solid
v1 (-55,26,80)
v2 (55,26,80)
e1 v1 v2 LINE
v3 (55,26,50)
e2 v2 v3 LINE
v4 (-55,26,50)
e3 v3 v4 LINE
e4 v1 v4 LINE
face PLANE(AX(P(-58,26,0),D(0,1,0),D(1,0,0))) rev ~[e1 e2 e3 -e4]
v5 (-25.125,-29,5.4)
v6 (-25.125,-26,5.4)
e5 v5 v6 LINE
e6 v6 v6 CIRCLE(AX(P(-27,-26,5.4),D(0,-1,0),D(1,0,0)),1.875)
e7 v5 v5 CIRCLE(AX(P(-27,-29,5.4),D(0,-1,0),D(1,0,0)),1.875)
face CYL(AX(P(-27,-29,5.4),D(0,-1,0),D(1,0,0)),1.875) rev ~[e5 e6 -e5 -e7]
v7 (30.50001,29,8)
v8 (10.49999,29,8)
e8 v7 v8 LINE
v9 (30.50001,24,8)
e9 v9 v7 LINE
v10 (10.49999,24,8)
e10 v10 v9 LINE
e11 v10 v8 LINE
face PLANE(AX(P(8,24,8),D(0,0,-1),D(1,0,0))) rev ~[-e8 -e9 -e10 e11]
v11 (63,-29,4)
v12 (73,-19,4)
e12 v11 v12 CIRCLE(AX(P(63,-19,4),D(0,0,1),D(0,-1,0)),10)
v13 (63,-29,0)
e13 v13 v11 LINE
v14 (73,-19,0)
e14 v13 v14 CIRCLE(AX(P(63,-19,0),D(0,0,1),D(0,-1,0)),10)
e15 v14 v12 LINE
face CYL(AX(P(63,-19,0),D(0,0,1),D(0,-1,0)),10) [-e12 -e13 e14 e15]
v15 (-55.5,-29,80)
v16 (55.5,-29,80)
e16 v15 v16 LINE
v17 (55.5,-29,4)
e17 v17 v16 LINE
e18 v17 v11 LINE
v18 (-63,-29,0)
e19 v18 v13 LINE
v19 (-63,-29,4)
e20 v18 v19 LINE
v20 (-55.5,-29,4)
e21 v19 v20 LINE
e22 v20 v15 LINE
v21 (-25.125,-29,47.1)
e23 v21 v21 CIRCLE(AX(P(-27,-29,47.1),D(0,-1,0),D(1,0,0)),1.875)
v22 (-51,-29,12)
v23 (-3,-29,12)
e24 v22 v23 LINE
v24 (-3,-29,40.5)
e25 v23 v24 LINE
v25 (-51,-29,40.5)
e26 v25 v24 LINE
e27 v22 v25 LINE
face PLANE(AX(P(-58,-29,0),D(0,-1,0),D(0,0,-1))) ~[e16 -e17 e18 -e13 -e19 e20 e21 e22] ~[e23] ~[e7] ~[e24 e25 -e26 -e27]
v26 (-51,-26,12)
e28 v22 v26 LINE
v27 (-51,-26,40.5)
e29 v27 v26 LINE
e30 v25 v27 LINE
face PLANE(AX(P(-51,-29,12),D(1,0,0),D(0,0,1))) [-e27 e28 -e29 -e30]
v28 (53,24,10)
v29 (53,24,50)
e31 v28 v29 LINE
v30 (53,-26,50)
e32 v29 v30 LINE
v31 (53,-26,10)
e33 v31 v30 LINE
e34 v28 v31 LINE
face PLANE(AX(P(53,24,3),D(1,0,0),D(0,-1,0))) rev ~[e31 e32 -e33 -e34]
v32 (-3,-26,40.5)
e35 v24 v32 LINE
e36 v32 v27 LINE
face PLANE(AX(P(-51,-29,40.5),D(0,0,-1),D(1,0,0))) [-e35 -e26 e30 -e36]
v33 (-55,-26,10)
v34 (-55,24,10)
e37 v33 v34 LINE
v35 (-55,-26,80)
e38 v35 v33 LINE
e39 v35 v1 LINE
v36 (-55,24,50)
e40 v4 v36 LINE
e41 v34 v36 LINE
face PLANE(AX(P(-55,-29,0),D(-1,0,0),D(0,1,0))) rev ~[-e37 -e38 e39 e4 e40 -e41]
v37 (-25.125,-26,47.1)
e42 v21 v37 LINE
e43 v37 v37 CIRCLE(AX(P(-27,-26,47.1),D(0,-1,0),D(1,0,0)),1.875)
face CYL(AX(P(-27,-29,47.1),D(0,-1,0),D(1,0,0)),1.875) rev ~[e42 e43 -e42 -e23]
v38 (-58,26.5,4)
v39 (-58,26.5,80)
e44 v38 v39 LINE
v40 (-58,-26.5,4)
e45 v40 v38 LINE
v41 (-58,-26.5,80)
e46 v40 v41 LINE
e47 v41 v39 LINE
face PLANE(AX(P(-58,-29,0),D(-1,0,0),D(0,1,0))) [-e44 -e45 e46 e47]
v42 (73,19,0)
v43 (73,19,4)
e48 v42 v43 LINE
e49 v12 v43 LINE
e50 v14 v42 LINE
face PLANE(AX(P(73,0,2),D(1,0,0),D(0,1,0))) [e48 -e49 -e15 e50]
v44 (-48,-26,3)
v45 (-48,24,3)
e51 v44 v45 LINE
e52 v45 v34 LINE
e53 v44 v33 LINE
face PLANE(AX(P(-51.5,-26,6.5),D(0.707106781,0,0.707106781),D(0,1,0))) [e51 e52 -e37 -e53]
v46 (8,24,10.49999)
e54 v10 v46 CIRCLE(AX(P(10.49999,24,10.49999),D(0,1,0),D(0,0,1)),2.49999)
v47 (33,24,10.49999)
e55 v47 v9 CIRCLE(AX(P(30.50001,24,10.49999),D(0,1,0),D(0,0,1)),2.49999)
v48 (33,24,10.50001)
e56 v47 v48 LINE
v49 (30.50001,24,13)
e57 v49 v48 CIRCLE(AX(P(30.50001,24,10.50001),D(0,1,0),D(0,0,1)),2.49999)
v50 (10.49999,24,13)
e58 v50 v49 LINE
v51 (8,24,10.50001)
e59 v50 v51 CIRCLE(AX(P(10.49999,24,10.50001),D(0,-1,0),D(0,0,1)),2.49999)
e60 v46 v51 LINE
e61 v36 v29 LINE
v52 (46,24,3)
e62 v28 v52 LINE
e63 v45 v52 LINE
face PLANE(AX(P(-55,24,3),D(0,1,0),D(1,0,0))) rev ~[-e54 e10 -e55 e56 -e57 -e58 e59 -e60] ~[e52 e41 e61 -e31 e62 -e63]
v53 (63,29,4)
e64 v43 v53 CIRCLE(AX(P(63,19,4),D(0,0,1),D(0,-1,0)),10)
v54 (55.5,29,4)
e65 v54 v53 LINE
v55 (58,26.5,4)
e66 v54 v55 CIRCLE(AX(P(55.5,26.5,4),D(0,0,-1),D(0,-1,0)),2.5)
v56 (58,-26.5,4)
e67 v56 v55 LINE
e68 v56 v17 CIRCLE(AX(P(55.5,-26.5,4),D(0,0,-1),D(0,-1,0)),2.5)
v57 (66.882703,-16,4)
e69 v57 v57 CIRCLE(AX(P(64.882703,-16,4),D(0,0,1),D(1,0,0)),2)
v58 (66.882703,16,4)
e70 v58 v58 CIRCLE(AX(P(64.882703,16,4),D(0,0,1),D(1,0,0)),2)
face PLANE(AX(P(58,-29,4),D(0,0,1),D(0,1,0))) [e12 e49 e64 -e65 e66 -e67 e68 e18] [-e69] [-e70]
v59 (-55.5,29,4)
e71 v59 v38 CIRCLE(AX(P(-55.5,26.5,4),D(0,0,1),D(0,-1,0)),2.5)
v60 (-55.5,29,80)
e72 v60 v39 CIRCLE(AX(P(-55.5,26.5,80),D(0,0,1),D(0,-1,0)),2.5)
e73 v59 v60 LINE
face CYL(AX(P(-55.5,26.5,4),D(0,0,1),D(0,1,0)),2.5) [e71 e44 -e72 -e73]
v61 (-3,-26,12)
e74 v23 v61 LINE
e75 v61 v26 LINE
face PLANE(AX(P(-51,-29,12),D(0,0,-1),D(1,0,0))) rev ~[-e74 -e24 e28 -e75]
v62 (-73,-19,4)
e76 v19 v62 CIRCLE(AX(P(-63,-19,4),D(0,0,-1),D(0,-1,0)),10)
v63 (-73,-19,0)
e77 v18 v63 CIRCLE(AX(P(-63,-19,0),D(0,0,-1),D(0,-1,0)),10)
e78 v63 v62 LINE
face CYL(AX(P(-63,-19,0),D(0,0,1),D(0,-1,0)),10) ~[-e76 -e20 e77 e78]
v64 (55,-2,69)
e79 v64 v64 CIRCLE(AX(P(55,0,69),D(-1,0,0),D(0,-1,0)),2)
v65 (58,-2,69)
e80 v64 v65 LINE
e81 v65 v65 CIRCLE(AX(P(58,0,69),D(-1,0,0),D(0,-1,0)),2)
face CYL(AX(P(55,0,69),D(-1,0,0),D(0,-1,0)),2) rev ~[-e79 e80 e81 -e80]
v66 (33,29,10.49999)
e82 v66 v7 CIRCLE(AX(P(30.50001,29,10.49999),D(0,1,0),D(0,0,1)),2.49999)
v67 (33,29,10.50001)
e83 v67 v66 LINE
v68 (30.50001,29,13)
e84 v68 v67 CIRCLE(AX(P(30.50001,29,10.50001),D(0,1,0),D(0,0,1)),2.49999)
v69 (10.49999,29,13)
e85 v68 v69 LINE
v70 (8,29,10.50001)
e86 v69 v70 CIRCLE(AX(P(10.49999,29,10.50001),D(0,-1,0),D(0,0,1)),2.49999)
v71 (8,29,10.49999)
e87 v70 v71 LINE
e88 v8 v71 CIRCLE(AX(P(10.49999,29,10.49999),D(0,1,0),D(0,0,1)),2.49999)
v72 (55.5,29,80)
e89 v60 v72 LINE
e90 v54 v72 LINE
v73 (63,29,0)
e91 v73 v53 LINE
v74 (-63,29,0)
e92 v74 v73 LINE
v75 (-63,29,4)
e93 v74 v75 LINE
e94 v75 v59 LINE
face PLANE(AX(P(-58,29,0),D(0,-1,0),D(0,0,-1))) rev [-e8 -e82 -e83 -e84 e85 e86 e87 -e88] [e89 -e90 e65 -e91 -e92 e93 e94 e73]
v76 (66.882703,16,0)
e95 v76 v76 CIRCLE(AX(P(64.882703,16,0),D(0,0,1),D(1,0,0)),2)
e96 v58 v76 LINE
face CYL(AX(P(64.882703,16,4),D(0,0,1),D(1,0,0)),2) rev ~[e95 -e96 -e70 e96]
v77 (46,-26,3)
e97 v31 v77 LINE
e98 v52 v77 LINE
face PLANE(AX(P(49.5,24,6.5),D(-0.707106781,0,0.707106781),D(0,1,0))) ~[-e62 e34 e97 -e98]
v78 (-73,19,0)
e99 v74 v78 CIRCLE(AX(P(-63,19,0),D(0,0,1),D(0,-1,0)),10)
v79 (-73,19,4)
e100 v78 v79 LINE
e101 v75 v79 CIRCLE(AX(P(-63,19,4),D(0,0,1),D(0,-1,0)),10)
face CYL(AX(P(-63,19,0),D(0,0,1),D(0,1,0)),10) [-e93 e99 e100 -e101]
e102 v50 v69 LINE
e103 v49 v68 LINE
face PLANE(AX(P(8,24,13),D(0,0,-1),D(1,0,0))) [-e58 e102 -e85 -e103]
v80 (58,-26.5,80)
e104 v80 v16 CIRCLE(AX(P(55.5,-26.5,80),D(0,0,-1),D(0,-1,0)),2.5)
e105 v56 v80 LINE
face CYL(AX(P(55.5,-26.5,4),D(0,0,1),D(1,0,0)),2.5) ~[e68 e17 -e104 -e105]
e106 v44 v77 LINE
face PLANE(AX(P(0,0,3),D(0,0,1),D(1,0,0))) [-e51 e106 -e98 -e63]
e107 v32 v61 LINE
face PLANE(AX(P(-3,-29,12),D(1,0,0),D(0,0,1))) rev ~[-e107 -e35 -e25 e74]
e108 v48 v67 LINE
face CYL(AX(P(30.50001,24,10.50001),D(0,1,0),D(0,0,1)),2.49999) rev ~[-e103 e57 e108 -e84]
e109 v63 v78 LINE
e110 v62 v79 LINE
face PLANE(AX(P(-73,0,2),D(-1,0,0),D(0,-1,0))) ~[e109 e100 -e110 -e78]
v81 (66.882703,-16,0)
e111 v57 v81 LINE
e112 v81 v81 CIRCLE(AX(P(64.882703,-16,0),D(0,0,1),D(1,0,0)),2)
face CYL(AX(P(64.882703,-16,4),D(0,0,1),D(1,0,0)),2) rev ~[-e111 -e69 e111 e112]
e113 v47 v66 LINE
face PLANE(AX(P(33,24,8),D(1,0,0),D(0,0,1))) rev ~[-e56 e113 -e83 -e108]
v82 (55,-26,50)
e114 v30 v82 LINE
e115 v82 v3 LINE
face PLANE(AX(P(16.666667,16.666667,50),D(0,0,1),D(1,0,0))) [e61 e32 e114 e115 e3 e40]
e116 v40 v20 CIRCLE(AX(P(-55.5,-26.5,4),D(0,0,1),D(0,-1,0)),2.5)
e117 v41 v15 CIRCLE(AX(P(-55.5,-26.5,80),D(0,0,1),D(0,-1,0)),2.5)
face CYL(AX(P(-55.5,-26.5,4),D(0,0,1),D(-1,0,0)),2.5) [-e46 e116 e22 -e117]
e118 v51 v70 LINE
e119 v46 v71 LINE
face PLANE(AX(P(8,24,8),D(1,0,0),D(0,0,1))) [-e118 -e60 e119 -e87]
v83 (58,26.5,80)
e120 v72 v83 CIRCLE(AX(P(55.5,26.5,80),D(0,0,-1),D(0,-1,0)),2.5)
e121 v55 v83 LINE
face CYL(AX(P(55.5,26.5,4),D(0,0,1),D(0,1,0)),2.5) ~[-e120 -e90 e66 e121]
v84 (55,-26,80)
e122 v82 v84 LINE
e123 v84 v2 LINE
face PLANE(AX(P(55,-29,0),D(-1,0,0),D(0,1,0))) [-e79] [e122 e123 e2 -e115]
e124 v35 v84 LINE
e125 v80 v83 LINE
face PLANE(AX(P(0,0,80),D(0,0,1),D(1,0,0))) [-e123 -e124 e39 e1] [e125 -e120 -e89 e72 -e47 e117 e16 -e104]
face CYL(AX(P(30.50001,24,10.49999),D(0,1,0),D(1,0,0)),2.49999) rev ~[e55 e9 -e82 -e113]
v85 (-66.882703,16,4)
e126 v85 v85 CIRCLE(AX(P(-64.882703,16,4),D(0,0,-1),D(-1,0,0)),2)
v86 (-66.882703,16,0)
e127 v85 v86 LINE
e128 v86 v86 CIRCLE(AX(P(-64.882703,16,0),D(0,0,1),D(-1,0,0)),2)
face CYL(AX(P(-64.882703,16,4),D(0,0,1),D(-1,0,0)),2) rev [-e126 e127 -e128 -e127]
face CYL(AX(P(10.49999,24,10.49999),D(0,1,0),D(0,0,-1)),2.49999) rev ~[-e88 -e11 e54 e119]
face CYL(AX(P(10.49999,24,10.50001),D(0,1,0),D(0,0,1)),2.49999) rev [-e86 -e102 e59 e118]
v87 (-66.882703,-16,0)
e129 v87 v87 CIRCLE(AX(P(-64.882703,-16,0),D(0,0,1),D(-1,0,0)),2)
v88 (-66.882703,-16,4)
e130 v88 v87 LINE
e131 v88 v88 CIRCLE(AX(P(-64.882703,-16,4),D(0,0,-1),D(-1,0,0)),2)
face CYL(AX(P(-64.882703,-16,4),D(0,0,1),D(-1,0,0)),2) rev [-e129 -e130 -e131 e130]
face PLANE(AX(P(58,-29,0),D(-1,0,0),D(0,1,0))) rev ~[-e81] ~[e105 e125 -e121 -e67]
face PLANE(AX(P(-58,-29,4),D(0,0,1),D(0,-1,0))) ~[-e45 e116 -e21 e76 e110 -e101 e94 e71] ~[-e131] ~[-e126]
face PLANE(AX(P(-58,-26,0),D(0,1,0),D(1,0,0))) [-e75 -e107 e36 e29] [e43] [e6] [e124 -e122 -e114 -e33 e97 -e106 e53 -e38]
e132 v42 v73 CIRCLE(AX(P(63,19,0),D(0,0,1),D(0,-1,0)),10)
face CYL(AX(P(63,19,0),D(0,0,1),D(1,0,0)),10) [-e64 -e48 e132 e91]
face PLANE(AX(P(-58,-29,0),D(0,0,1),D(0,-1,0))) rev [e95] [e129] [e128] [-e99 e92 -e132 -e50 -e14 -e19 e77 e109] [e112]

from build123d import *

# Parameters (mm, degrees)
F0_W      = 116
F0_H      = 58
F1_DEPTH  = 80
F2_T      = -3
F4_DEPTH  = 47
F5_R      = 2
F6_DEPTH  = 3.001
F7_W      = 58
F7_H      = 4
F8_DEPTH  = 15
F9_R      = 10
F10_R     = 2
F11_DEPTH = 4.001
F12_W     = 48
F12_H     = 28.5
F13_DEPTH = 5
F14_R     = 1.875
F15_DEPTH = 5
F16_W     = 25
F16_H     = 5
F17_DEPTH = 5.001
F18_R     = 2.49999
F19_R     = 2.5
F20_SIZE  = 7


# Not quite as in the source:
# - a fillet or chamfer is up to 0.001 mm smaller than in the source, because OpenCascade refuses the exact size
# - a pattern or mirror of a feature is missing from the dataset's text; its kind, count and spacing are read off the source's solid


with BuildPart() as f1:
    # F0 (on Top) → F1 (new body)
    with BuildSketch(Plane.XY):
        Rectangle(F0_W, F0_H)
    extrude(amount=F1_DEPTH)

    # F2
    f2_openings = [f1.faces().sort_by_distance(p)[0] for p in [
        (0, 0, 80),
    ]]
    offset(amount=F2_T, openings=f2_openings)

    # F3 (on face) → F4 (join)
    with BuildSketch(Plane.XY.offset(3)):
        Polygon((-55, 26), (-55, 24), (53, 24), (53, -26), (55, -26), (55, 26), align=None)
    extrude(amount=F4_DEPTH)

    # F5 (on face) → F6 (cut, through all)
    with BuildSketch(Plane(origin=(55, 0, 0), x_dir=(0, -1, 0), z_dir=(-1, 0, 0))):
        with Locations((0, 69)):
            Circle(F5_R)
    extrude(amount=-F6_DEPTH, mode=Mode.SUBTRACT)

    # F7 (on face) → F8 (join)
    with BuildSketch(Plane.YZ.offset(58)):
        with Locations((0, 2)):
            Rectangle(F7_W, F7_H)
    f8 = extrude(amount=F8_DEPTH)

    # F8_copies: F8 across plane
    add(f8.mirror(Plane(origin=(0, 0, 0), x_dir=(0, 0, -1), z_dir=(-1, 0, 0))))

    # F9
    f9_edges = [f1.edges().sort_by_distance(p)[0] for p in [
        (73, 29, 2),
        (73, -29, 2),
        (-73, -29, 2),
        (-73, 29, 2),
    ]]
    fillet(f9_edges, radius=F9_R)

    # F10 (on face) → F11 (cut, through all)
    with BuildSketch(Plane.XY.offset(4)):
        with Locations((64.8827031255, 16)):
            Circle(F10_R)
        with Locations((64.8827031255, -16)):
            Circle(F10_R)
    f11 = extrude(amount=-F11_DEPTH, mode=Mode.SUBTRACT)

    # F11_copies: F11 across plane
    add(f11.mirror(Plane(origin=(0, 0, 0), x_dir=(0, 0, -1), z_dir=(-1, 0, 0))), mode=Mode.SUBTRACT)

    # F12 (on face) → F13 (cut)
    with BuildSketch(Plane.XZ.offset(29)):
        with Locations((-27, 26.25)):
            Rectangle(F12_W, F12_H)
    extrude(amount=-F13_DEPTH, mode=Mode.SUBTRACT)

    # F14 (on face) → F15 (cut)
    with BuildSketch(Plane.XZ.offset(29)):
        with Locations((-27, 47.1)):
            Circle(F14_R)
        with Locations((-27, 5.4)):
            Circle(F14_R)
    extrude(amount=-F15_DEPTH, mode=Mode.SUBTRACT)

    # F16 (on face) → F17 (cut, through all)
    with BuildSketch(Plane.XZ.offset(-24)):
        with Locations((20.5, 10.5)):
            Rectangle(F16_W, F16_H)
    extrude(amount=-F17_DEPTH, mode=Mode.SUBTRACT)

    # F18 (radius 2.5 in the source; OpenCascade refuses exactly that, so slightly less here)
    f18_edges = [f1.edges().sort_by_distance(p)[0] for p in [
        (33, 26.5, 13),
        (8, 26.5, 13),
        (33, 26.5, 8),
        (8, 26.5, 8),
    ]]
    fillet(f18_edges, radius=F18_R)

    # F19
    f19_edges = [f1.edges().sort_by_distance(p)[0] for p in [
        (-58, -29, 42),
        (58, -29, 42),
        (58, 29, 42),
        (-58, 29, 42),
    ]]
    fillet(f19_edges, radius=F19_R)

    # F20
    f20_edges = [f1.edges().sort_by_distance(p)[0] for p in [
        (-55, -1, 3),
        (53, -1, 3),
    ]]
    chamfer(f20_edges, length=F20_SIZE)


solid = f1.part
